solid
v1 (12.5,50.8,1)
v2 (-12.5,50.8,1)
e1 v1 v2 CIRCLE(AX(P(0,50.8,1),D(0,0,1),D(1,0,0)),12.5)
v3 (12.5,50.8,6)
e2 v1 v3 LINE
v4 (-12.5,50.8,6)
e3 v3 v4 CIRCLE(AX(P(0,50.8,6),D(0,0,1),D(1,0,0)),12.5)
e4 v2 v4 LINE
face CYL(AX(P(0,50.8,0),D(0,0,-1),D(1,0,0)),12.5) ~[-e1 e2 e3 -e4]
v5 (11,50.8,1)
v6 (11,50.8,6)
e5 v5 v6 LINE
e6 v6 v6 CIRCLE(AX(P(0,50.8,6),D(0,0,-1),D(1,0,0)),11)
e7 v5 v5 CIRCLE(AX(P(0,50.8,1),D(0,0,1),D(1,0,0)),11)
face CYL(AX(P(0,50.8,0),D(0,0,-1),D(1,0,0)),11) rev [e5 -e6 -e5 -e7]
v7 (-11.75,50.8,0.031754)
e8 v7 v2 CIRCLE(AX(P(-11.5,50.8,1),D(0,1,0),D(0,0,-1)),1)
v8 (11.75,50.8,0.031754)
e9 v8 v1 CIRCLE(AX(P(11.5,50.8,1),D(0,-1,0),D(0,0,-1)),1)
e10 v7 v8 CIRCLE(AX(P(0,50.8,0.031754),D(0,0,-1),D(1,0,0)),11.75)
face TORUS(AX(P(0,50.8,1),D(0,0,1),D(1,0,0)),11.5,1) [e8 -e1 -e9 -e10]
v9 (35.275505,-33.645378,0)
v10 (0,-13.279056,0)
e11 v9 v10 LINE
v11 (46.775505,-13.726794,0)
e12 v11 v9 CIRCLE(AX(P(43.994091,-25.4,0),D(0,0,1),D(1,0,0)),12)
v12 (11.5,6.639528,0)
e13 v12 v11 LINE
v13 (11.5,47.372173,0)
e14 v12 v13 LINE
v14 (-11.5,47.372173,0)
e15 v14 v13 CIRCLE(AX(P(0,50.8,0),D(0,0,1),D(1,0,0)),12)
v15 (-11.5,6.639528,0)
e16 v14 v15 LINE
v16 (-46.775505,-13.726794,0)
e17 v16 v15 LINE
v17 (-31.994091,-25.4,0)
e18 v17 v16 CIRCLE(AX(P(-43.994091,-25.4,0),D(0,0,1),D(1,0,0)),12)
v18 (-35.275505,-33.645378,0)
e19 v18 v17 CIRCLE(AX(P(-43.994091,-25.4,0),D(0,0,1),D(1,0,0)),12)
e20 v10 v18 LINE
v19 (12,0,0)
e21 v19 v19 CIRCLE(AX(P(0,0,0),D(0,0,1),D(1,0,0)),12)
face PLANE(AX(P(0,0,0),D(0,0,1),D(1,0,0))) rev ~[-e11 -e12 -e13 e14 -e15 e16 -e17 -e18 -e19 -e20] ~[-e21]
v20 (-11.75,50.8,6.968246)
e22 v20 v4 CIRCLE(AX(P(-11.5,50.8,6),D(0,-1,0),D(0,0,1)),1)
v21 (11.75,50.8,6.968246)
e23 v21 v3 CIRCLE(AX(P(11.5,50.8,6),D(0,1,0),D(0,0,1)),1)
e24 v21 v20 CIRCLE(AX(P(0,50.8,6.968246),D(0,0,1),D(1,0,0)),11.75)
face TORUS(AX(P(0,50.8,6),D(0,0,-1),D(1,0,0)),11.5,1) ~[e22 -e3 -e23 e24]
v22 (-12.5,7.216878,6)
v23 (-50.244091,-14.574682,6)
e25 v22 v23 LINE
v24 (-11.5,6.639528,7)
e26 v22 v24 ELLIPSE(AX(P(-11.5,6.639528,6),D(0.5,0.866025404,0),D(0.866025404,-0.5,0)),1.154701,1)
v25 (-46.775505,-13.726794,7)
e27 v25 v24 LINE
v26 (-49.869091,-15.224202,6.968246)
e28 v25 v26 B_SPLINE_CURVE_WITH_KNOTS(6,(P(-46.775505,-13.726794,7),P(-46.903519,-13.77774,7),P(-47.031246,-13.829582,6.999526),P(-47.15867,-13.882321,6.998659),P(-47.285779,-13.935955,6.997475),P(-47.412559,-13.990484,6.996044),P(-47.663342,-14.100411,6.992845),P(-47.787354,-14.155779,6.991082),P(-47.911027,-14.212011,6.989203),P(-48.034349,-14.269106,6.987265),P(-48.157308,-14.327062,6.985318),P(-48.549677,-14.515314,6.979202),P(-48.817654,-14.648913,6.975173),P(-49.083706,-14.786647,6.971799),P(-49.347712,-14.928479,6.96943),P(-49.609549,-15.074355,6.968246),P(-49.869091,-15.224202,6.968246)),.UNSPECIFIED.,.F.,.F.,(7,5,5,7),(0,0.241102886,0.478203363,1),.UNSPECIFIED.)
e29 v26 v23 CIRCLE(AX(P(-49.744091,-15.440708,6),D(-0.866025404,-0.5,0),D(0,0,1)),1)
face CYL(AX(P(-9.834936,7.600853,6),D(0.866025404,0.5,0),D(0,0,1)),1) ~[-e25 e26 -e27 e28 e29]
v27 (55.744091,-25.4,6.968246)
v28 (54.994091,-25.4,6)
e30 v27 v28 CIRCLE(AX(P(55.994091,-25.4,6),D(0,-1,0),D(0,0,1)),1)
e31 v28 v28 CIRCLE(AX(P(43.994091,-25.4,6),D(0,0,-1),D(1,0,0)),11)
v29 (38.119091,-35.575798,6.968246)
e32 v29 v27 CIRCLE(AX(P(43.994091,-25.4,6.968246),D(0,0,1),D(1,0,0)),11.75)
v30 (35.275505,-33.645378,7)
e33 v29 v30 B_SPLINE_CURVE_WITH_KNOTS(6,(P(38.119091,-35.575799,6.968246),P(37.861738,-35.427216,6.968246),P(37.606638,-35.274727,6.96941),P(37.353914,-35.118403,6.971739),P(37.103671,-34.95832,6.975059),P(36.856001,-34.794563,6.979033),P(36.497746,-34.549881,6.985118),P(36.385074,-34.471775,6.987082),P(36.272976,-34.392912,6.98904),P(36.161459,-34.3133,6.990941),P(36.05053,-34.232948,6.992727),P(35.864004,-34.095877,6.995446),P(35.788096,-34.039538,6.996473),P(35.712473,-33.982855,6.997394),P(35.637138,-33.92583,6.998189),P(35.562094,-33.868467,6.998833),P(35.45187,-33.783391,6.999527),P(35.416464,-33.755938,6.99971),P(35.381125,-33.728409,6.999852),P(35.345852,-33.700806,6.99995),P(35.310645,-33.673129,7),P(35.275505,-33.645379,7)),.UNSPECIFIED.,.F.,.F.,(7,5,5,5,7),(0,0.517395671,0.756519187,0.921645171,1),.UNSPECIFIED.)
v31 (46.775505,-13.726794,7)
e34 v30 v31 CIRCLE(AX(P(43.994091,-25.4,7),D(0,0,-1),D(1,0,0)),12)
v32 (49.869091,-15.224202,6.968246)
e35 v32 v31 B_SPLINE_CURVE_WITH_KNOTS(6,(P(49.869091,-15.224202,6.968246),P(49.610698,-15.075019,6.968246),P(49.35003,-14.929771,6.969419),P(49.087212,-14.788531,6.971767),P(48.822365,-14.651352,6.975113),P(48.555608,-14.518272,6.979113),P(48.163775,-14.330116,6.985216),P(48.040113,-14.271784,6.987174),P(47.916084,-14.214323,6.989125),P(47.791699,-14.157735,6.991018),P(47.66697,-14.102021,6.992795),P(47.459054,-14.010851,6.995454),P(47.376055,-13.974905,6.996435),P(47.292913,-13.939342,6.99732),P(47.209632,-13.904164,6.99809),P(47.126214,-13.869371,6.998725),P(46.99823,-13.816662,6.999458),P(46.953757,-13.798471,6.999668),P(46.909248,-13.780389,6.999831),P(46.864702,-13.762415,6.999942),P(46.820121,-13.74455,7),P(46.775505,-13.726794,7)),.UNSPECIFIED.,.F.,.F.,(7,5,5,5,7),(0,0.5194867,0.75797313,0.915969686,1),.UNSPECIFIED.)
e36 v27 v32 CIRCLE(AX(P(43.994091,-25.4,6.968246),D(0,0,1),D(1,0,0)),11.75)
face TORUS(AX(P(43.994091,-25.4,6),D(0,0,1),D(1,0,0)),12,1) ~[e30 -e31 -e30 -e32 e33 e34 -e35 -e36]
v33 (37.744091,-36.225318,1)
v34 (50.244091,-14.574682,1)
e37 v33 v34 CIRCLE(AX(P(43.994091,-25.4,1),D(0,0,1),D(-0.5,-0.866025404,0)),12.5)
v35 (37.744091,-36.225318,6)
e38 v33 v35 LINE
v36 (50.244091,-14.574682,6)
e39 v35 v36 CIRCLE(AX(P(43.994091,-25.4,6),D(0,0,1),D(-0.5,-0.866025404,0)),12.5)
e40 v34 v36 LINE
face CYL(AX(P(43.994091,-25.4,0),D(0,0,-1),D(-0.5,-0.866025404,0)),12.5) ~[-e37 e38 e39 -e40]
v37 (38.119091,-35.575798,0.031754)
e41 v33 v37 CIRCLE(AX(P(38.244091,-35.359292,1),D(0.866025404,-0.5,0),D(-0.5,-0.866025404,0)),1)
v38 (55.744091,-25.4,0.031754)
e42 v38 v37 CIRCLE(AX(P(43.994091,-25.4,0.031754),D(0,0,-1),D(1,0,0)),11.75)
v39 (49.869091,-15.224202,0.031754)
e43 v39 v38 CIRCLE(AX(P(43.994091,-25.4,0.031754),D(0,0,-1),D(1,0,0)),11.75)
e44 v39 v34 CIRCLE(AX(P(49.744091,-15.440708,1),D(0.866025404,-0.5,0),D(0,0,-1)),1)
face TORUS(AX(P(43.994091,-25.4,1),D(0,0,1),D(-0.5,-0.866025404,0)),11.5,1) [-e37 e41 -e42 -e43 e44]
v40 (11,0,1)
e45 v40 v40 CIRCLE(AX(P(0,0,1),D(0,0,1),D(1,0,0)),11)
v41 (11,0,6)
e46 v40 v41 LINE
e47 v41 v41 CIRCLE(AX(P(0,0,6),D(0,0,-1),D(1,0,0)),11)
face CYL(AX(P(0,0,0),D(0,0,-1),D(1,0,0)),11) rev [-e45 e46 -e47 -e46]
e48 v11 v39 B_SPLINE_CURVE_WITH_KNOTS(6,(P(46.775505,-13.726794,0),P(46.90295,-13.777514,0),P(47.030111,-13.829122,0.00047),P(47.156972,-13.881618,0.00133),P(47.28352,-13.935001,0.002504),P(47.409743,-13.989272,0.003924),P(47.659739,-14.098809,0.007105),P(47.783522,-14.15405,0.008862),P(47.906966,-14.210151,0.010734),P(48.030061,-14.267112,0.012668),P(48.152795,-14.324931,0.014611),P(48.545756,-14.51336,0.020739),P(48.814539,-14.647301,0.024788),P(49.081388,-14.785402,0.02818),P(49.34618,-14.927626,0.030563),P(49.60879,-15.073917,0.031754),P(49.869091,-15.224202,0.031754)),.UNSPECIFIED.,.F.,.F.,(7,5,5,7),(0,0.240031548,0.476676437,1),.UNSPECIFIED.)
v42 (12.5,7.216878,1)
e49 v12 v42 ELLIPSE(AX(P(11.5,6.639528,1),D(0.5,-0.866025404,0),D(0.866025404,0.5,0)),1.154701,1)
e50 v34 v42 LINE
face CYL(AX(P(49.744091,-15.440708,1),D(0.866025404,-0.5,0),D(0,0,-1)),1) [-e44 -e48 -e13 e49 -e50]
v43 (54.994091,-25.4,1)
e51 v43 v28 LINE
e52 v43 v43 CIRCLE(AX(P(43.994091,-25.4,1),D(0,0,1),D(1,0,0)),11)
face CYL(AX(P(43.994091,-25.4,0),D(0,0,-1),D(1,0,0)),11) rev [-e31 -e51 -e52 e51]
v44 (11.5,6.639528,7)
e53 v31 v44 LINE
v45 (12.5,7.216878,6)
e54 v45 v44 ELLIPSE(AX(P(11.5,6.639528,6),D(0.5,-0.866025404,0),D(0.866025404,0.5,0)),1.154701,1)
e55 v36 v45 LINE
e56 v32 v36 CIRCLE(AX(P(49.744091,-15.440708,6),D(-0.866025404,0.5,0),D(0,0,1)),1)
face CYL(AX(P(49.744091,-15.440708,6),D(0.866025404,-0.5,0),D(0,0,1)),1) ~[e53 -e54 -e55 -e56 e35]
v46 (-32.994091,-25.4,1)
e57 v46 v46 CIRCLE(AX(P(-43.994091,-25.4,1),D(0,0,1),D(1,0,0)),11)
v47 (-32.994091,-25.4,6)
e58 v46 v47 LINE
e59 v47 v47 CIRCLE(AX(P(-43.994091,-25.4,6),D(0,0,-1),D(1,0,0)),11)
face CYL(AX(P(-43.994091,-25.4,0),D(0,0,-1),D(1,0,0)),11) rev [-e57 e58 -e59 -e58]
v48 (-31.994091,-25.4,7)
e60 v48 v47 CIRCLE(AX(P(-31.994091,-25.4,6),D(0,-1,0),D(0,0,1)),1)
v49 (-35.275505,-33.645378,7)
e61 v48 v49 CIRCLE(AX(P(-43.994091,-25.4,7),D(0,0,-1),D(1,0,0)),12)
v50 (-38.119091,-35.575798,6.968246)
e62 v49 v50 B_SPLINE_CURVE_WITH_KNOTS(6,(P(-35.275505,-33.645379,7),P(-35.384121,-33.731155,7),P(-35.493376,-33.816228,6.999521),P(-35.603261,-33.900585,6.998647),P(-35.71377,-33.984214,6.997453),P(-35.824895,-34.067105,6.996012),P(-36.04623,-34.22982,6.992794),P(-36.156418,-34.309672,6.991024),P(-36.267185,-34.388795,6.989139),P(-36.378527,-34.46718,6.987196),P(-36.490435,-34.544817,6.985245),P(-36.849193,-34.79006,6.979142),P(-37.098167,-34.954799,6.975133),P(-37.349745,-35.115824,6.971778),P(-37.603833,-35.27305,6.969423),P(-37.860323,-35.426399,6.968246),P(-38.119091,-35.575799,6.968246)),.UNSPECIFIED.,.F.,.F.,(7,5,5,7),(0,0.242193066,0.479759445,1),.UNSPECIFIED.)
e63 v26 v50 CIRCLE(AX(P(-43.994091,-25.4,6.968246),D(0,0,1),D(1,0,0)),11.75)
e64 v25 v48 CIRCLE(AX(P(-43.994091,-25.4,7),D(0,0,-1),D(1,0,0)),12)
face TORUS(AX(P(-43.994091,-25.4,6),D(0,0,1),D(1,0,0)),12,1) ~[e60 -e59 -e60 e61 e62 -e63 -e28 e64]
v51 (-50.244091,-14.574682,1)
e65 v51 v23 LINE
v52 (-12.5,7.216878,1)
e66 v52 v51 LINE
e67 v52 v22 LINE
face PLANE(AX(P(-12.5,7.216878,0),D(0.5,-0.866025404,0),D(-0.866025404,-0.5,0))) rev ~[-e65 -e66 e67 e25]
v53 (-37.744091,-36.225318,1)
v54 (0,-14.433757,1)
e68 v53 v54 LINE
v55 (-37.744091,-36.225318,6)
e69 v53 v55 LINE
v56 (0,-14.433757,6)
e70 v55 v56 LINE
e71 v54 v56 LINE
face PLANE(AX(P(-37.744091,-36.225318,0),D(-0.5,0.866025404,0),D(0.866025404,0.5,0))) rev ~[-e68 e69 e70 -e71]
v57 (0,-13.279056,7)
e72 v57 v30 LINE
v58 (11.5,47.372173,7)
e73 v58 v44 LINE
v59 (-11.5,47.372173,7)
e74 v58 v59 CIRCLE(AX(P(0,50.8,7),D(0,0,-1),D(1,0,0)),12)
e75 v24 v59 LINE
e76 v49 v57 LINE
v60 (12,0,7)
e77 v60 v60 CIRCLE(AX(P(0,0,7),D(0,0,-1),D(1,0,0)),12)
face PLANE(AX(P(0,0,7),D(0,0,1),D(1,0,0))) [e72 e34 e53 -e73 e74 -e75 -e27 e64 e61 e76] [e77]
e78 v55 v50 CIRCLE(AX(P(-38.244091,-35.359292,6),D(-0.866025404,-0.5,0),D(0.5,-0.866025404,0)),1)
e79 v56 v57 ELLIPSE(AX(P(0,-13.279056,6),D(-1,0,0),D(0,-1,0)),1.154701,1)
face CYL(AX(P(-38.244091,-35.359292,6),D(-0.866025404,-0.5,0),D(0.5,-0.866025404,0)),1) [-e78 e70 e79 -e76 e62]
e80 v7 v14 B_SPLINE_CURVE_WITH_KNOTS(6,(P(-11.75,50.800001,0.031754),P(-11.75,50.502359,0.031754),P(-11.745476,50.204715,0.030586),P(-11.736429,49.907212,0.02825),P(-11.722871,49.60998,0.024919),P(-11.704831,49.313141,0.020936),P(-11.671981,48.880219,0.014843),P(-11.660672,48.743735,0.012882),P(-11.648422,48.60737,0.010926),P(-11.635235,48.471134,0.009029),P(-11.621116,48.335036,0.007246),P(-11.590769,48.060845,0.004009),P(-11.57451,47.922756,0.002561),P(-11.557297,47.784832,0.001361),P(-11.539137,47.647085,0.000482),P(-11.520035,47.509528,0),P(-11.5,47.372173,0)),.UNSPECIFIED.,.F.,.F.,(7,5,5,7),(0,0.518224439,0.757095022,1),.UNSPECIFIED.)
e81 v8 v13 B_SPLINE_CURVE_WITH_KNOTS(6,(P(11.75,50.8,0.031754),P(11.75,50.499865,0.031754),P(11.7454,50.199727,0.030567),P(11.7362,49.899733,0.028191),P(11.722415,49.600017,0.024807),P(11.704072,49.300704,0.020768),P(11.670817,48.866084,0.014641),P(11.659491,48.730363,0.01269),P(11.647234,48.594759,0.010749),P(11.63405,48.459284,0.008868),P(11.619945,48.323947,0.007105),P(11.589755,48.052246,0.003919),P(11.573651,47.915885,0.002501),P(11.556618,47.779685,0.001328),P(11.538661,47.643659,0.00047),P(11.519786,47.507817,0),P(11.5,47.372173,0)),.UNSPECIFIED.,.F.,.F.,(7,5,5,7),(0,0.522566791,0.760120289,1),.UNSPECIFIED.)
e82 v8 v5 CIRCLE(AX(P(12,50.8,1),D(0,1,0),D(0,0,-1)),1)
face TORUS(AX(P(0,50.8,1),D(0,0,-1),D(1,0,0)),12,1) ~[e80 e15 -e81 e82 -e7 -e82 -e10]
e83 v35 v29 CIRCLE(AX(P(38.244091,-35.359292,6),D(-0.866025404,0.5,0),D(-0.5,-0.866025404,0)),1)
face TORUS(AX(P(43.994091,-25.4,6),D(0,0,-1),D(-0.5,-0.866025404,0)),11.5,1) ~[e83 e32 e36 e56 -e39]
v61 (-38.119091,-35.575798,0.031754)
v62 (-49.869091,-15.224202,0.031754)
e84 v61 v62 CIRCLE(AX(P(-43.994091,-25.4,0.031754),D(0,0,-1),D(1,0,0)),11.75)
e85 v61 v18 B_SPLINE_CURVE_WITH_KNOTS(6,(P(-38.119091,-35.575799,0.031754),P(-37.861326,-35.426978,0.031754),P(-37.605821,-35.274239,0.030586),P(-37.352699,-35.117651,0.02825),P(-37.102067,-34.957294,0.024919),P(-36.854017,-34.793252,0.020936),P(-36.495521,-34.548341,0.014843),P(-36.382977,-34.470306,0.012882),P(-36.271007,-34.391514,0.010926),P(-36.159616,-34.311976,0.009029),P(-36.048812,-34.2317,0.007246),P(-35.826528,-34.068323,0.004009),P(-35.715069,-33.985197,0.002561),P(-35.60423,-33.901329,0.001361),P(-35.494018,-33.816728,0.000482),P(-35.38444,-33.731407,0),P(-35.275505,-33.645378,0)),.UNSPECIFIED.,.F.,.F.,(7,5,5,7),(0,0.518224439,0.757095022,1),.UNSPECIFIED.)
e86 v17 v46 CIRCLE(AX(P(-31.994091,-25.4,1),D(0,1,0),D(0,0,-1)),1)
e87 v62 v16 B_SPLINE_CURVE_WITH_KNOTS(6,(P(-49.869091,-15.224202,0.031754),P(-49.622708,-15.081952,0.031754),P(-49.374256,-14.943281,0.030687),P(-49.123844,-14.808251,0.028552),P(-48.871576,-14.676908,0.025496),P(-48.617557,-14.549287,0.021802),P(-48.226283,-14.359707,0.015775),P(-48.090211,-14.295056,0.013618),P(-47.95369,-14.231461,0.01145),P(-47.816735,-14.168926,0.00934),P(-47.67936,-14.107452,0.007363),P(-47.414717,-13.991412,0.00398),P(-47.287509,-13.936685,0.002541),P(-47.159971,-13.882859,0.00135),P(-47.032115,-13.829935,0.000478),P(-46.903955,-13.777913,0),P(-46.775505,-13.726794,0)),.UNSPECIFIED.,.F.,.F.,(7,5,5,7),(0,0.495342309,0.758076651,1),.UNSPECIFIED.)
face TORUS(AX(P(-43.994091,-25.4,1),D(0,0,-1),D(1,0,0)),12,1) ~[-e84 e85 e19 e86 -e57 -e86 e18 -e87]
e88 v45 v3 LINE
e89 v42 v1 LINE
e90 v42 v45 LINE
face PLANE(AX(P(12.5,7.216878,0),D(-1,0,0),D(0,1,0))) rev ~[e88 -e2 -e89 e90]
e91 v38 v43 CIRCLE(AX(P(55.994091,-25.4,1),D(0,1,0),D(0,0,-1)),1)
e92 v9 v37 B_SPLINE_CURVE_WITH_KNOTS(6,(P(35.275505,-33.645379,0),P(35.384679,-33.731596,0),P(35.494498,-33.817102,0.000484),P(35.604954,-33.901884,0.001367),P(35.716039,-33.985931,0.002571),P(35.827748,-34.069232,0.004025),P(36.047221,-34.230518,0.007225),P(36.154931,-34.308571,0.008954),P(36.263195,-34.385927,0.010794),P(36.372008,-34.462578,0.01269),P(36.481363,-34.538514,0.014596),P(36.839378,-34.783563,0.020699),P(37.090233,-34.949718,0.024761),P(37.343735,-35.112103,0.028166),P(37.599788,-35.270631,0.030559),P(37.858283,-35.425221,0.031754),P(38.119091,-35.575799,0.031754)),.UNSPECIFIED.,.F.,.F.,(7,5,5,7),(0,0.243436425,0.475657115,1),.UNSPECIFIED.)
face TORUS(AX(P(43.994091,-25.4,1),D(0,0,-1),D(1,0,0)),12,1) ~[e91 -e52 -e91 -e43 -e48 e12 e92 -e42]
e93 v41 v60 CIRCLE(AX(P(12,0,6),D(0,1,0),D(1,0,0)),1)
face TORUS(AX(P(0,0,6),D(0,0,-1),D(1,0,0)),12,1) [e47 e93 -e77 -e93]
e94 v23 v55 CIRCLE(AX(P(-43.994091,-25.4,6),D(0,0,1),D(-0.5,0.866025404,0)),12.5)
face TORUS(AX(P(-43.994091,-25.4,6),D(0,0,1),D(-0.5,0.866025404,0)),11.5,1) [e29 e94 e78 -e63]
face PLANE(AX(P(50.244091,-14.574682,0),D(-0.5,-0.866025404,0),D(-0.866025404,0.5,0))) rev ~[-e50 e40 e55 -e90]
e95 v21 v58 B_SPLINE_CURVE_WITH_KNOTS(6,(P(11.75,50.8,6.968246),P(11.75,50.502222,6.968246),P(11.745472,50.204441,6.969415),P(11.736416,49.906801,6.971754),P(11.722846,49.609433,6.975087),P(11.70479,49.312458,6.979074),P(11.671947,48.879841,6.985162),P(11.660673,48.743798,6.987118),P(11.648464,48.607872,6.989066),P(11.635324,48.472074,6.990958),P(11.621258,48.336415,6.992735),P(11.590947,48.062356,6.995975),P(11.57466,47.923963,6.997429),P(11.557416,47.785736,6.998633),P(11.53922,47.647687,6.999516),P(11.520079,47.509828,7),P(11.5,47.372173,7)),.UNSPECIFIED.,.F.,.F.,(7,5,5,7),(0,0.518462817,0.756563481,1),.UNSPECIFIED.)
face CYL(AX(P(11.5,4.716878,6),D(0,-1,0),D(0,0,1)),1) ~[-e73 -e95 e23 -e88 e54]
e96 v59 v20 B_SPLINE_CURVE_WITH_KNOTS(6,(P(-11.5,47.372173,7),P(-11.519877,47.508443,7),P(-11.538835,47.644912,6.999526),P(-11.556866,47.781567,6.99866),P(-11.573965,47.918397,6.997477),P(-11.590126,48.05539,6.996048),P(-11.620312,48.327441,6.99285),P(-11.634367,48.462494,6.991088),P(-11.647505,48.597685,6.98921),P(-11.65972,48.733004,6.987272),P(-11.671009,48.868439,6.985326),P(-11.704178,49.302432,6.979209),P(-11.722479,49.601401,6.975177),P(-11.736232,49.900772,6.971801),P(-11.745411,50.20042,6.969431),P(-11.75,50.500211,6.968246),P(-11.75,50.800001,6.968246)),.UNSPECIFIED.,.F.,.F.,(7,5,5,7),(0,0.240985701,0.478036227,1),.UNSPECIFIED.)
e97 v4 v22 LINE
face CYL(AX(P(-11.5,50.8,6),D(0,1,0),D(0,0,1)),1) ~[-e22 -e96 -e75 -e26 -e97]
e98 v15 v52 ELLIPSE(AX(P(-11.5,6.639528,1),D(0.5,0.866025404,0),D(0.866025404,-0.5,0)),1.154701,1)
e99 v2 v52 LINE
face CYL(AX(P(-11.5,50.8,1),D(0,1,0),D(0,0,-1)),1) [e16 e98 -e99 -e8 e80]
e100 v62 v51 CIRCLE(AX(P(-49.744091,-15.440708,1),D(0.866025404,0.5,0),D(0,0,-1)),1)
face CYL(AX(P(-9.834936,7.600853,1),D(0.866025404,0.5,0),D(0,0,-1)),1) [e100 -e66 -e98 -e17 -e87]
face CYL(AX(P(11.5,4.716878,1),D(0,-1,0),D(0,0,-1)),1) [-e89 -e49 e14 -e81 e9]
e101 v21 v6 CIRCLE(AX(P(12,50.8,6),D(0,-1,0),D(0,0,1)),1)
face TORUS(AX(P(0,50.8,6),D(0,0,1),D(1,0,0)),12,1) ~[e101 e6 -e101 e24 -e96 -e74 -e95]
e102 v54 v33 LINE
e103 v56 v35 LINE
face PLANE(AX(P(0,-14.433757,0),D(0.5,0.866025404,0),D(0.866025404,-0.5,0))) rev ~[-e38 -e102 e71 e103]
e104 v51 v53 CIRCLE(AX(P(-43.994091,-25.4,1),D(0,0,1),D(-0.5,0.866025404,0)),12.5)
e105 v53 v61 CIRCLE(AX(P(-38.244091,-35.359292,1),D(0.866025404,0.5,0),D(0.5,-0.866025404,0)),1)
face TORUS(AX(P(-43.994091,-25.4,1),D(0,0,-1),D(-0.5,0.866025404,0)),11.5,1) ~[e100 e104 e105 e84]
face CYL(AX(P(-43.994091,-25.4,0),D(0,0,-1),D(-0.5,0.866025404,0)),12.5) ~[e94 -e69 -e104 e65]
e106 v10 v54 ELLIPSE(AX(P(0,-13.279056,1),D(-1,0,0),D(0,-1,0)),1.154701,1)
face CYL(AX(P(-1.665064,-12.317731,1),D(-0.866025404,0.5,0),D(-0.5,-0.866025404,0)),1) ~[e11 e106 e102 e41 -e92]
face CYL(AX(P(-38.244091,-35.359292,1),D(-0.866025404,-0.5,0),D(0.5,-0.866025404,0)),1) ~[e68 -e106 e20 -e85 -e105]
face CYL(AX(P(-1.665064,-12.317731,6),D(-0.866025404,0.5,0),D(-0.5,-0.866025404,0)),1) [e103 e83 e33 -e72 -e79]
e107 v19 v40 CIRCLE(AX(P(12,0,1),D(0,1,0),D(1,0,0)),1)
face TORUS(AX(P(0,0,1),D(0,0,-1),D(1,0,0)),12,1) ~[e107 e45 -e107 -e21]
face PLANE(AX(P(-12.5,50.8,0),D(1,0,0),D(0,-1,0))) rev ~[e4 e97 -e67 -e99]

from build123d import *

# Parameters (mm, degrees)
F2_DEPTH      = 7
F1_R          = 11
F3_DEPTH      = 25.4
F4_T8_DEPTH   = 46.0831216351
F4_T13_DEPTH  = 46.0831216351
F4_T18_DEPTH  = 46.0831216351
F4_T23_DEPTH  = 46.0831216351
F4_T28_DEPTH  = 46.0831216351
F4_T37_DEPTH  = 46.0831216351
F4_T42_DEPTH  = 46.0831216351
F4_T51_DEPTH  = 46.0831216351
F4_T56_DEPTH  = 46.0831216351
F4_T59_ANGLE  = 180
F4_T61_ANGLE  = 180
F4_T63_ANGLE  = 180
F4_T67_DEPTH  = 46.0831216351
F4_T70_ANGLE  = 180
F4_T74_DEPTH  = 46.0831216351
F4_T77_ANGLE  = 180
F4_T81_DEPTH  = 46.0831216351
F4_T84_ANGLE  = 180
F4_T89_DEPTH  = 46.0831216351
F4_T93_DEPTH  = 46.0831216351
F4_T100_DEPTH = 46.0831216351
F4_T104_DEPTH = 46.0831216351
F4_T111_DEPTH = 46.0831216351
F4_T115_DEPTH = 46.0831216351
F4_T122_DEPTH = 46.0831216351
F4_T126_DEPTH = 46.0831216351
F4_T133_DEPTH = 46.0831216351
F4_T137_DEPTH = 46.0831216351
F4_T144_DEPTH = 46.0831216351
F4_T148_DEPTH = 46.0831216351
F5_R          = 1


# Not quite as in the source:
# - a fillet or chamfer that OpenCascade refuses, or shapes differently, is made with other operations: its cross-section is extruded or revolved along the edge and cut away or added


with BuildPart() as f2:
    # F0 (on Top) → F2 (new body)
    with BuildSketch(Plane.XY):
        with BuildLine():
            ThreePointArc((12.5, 50.8), (0, 63.3), (-12.5, 50.8))
            Line((-12.5, 50.8), (-12.5, 7.2168783649))
            Line((-12.5, 7.2168783649), (-50.2440905122, -14.5746824527))
            ThreePointArc((-50.2440905122, -14.5746824527), (-54.8194080596, -31.65), (-37.7440905122, -36.2253175473))
            Line((-37.7440905122, -36.2253175473), (0, -14.4337567297))
            Line((0, -14.4337567297), (37.7440905122, -36.2253175473))
            ThreePointArc((37.7440905122, -36.2253175473), (54.8194080596, -31.65), (50.2440905122, -14.5746824527))
            Line((50.2440905122, -14.5746824527), (12.5, 7.2168783649))
            Line((12.5, 7.2168783649), (12.5, 50.8))
        make_face()
    extrude(amount=F2_DEPTH)

    # F1 (on Top) → F3 (cut)
    with BuildSketch(Plane.XY):
        with Locations((0, 50.8)):
            Circle(F1_R)
        with Locations((-43.9940905122, -25.4)):
            Circle(F1_R)
        with Locations((43.9940905122, -25.4)):
            Circle(F1_R)
        Circle(F1_R)
    extrude(amount=F3_DEPTH, mode=Mode.SUBTRACT)

    # F4: fillet of radius 1 on 15 edges, made by hand

    # F4_s1 → F4_t2 (revolve, cut)
    with BuildSketch(Plane.XZ.offset(-50.8)):
        with BuildLine():
            ThreePointArc((12, 7), (11.2928932188, 6.7071067812), (11, 6))
            Line((11, 6), (11, 7))
            Line((11, 7), (12, 7))
        make_face()
    revolve(axis=Axis((0, 50.8, 7), (0, 0, -1)), mode=Mode.SUBTRACT)

    # F4_s3 → F4_t4 (revolve, cut)
    with BuildSketch(Plane.XZ.offset(-50.8)):
        with BuildLine():
            ThreePointArc((12, 0), (11.2928932188, 0.2928932188), (11, 1))
            Line((11, 1), (11, 0))
            Line((11, 0), (12, 0))
        make_face()
    revolve(axis=Axis((0, 50.8, 0), (0, 0, 1)), mode=Mode.SUBTRACT)


with BuildPart() as f4_tool6:
    # F4_s7 → F4_t8 (new body)
    with BuildSketch(Plane.XZ.offset(-50.8)):
        with BuildLine():
            ThreePointArc((-11.5, 0), (-12.2071067812, 0.2928932188), (-12.5, 1))
            Line((-12.5, 1), (-12.5, 0))
            Line((-12.5, 0), (-11.5, 0))
        make_face()
    extrude(amount=F4_T8_DEPTH)

    split(bisect_by=Plane(origin=(-6.25, 10.8253175473, 0), x_dir=(0, 0, 1), z_dir=(-0.5, 0.8660254038, 0)), keep=Keep.TOP)


with BuildPart() as f2_1:
    add(f2.part)

    # F4_t5: cut F4_tool6
    add(f4_tool6.part, mode=Mode.SUBTRACT)


with BuildPart() as f4_tool11:
    # F4_s12 → F4_t13 (new body)
    with BuildSketch(Plane.XZ.offset(-4.7168783649)):
        with BuildLine():
            ThreePointArc((11.5, 0), (12.2071067812, 0.2928932188), (12.5, 1))
            Line((12.5, 1), (12.5, 0))
            Line((12.5, 0), (11.5, 0))
        make_face()
    extrude(amount=-F4_T13_DEPTH)

    split(bisect_by=Plane(origin=(6.25, 10.8253175473, 0), x_dir=(0, 0, 1), z_dir=(0.5, 0.8660254038, 0)), keep=Keep.TOP)


with BuildPart() as f2_2:
    add(f2_1.part)

    # F4_t10: cut F4_tool11
    add(f4_tool11.part, mode=Mode.SUBTRACT)


with BuildPart() as f4_tool16:
    # F4_s17 → F4_t18 (new body)
    with BuildSketch(Plane.XZ.offset(-4.7168783649)):
        with BuildLine():
            ThreePointArc((11.5, 7), (12.2071067812, 6.7071067812), (12.5, 6))
            Line((12.5, 6), (12.5, 7))
            Line((12.5, 7), (11.5, 7))
        make_face()
    extrude(amount=-F4_T18_DEPTH)

    split(bisect_by=Plane(origin=(6.25, 10.8253175473, 0), x_dir=(0, 0, 1), z_dir=(0.5, 0.8660254038, 0)), keep=Keep.TOP)


with BuildPart() as f2_3:
    add(f2_2.part)

    # F4_t15: cut F4_tool16
    add(f4_tool16.part, mode=Mode.SUBTRACT)


with BuildPart() as f4_tool21:
    # F4_s22 → F4_t23 (new body)
    with BuildSketch(Plane(origin=(-4.0849364905, -2.3584391824, 0), x_dir=(0, 0, 1), z_dir=(-0.8660254038, -0.5, 0))):
        with BuildLine():
            ThreePointArc((0, 11.5), (0.2928932188, 12.2071067812), (1, 12.5))
            Line((1, 12.5), (0, 12.5))
            Line((0, 12.5), (0, 11.5))
        make_face()
    extrude(amount=F4_T23_DEPTH)

    split(bisect_by=Plane.YZ.offset(-12.5), keep=Keep.BOTTOM)


with BuildPart() as f2_4:
    add(f2_3.part)

    # F4_t20: cut F4_tool21
    add(f4_tool21.part, mode=Mode.SUBTRACT)


with BuildPart() as f4_tool26:
    # F4_s27 → F4_t28 (new body)
    with BuildSketch(Plane(origin=(-4.0849364905, -2.3584391824, 0), x_dir=(0, 0, 1), z_dir=(-0.8660254038, -0.5, 0))):
        with BuildLine():
            ThreePointArc((7, 11.5), (6.7071067812, 12.2071067812), (6, 12.5))
            Line((6, 12.5), (7, 12.5))
            Line((7, 12.5), (7, 11.5))
        make_face()
    extrude(amount=F4_T28_DEPTH)

    split(bisect_by=Plane.YZ.offset(-12.5), keep=Keep.BOTTOM)


with BuildPart() as f2_5:
    add(f2_4.part)

    # F4_t25: cut F4_tool26
    add(f4_tool26.part, mode=Mode.SUBTRACT)

    # F4_s30 → F4_t31 (revolve, cut)
    with BuildSketch(Plane.XZ.offset(25.4)):
        with BuildLine():
            ThreePointArc((-31.9940905122, 0), (-32.7011972934, 0.2928932188), (-32.9940905122, 1))
            Line((-32.9940905122, 1), (-32.9940905122, 0))
            Line((-32.9940905122, 0), (-31.9940905122, 0))
        make_face()
    revolve(axis=Axis((-43.9940905122, -25.4, 0), (0, 0, 1)), mode=Mode.SUBTRACT)

    # F4_s32 → F4_t33 (revolve, cut)
    with BuildSketch(Plane.XZ.offset(25.4)):
        with BuildLine():
            ThreePointArc((-31.9940905122, 7), (-32.7011972934, 6.7071067812), (-32.9940905122, 6))
            Line((-32.9940905122, 6), (-32.9940905122, 7))
            Line((-32.9940905122, 7), (-31.9940905122, 7))
        make_face()
    revolve(axis=Axis((-43.9940905122, -25.4, 7), (0, 0, -1)), mode=Mode.SUBTRACT)


with BuildPart() as f4_tool35:
    # F4_s36 → F4_t37 (new body)
    with BuildSketch(Plane(origin=(43.9940905122, -25.4, 0), x_dir=(0, 0, 1), z_dir=(-0.8660254038, 0.5, 0))):
        with BuildLine():
            ThreePointArc((7, 11.5), (6.7071067812, 12.2071067812), (6, 12.5))
            Line((6, 12.5), (7, 12.5))
            Line((7, 12.5), (7, 11.5))
        make_face()
    extrude(amount=F4_T37_DEPTH)

    split(bisect_by=Plane.YZ.offset(12.5), keep=Keep.TOP)


with BuildPart() as f2_6:
    add(f2_5.part)

    # F4_t34: cut F4_tool35
    add(f4_tool35.part, mode=Mode.SUBTRACT)


with BuildPart() as f4_tool40:
    # F4_s41 → F4_t42 (new body)
    with BuildSketch(Plane(origin=(4.0849364905, -2.3584391824, 0), x_dir=(0, 0, 1), z_dir=(0.8660254038, -0.5, 0))):
        with BuildLine():
            ThreePointArc((6, 12.5), (6.7071067812, 12.2071067812), (7, 11.5))
            Line((7, 11.5), (7, 12.5))
            Line((7, 12.5), (6, 12.5))
        make_face()
    extrude(amount=F4_T42_DEPTH)

    split(bisect_by=Plane(origin=(6.25, -10.8253175473, 0), x_dir=(0, 0, 1), z_dir=(0.5, -0.8660254038, 0)), keep=Keep.TOP)


with BuildPart() as f2_7:
    add(f2_6.part)

    # F4_t39: cut F4_tool40
    add(f4_tool40.part, mode=Mode.SUBTRACT)

    # F4_s44 → F4_t45 (revolve, cut)
    with BuildSketch(Plane.XZ.offset(25.4)):
        with BuildLine():
            ThreePointArc((55.9940905122, 7), (55.2869837311, 6.7071067812), (54.9940905122, 6))
            Line((54.9940905122, 6), (54.9940905122, 7))
            Line((54.9940905122, 7), (55.9940905122, 7))
        make_face()
    revolve(axis=Axis((43.9940905122, -25.4, 7), (0, 0, -1)), mode=Mode.SUBTRACT)

    # F4_s46 → F4_t47 (revolve, cut)
    with BuildSketch(Plane.XZ.offset(25.4)):
        with BuildLine():
            ThreePointArc((55.9940905122, 0), (55.2869837311, 0.2928932188), (54.9940905122, 1))
            Line((54.9940905122, 1), (54.9940905122, 0))
            Line((54.9940905122, 0), (55.9940905122, 0))
        make_face()
    revolve(axis=Axis((43.9940905122, -25.4, 0), (0, 0, 1)), mode=Mode.SUBTRACT)


with BuildPart() as f4_tool49:
    # F4_s50 → F4_t51 (new body)
    with BuildSketch(Plane(origin=(4.0849364905, -2.3584391824, 0), x_dir=(0, 0, 1), z_dir=(0.8660254038, -0.5, 0))):
        with BuildLine():
            ThreePointArc((1, 12.5), (0.2928932188, 12.2071067812), (0, 11.5))
            Line((0, 11.5), (0, 12.5))
            Line((0, 12.5), (1, 12.5))
        make_face()
    extrude(amount=F4_T51_DEPTH)

    split(bisect_by=Plane(origin=(6.25, -10.8253175473, 0), x_dir=(0, 0, 1), z_dir=(0.5, -0.8660254038, 0)), keep=Keep.TOP)


with BuildPart() as f2_8:
    add(f2_7.part)

    # F4_t48: cut F4_tool49
    add(f4_tool49.part, mode=Mode.SUBTRACT)


with BuildPart() as f4_tool54:
    # F4_s55 → F4_t56 (new body)
    with BuildSketch(Plane(origin=(43.9940905122, -25.4, 0), x_dir=(0, 0, 1), z_dir=(-0.8660254038, 0.5, 0))):
        with BuildLine():
            ThreePointArc((0, 11.5), (0.2928932188, 12.2071067812), (1, 12.5))
            Line((1, 12.5), (0, 12.5))
            Line((0, 12.5), (0, 11.5))
        make_face()
    extrude(amount=F4_T56_DEPTH)

    split(bisect_by=Plane.YZ.offset(12.5), keep=Keep.TOP)


with BuildPart() as f2_9:
    add(f2_8.part)

    # F4_t53: cut F4_tool54
    add(f4_tool54.part, mode=Mode.SUBTRACT)

    # F4_s58 → F4_t59 (revolve, cut)
    with BuildSketch(Plane(origin=(43.9940905122, -25.4, 0), x_dir=(0, 0, 1), z_dir=(-0.8660254038, 0.5, 0))):
        with BuildLine():
            ThreePointArc((0, -11.5), (0.2928932188, -12.2071067812), (1, -12.5))
            Line((1, -12.5), (0, -12.5))
            Line((0, -12.5), (0, -11.5))
        make_face()
    revolve(axis=Axis((43.9940905122, -25.4, 0), (0, 0, 1)), revolution_arc=F4_T59_ANGLE, mode=Mode.SUBTRACT)

    # F4_s60 → F4_t61 (revolve, cut)
    with BuildSketch(Plane(origin=(43.9940905122, -25.4, 0), x_dir=(0, 0, 1), z_dir=(-0.8660254038, 0.5, 0))):
        with BuildLine():
            ThreePointArc((7, -11.5), (6.7071067812, -12.2071067812), (6, -12.5))
            Line((6, -12.5), (7, -12.5))
            Line((7, -12.5), (7, -11.5))
        make_face()
    revolve(axis=Axis((43.9940905122, -25.4, 7), (0, 0, 1)), revolution_arc=F4_T61_ANGLE, mode=Mode.SUBTRACT)

    # F4_s62 → F4_t63 (revolve, cut)
    with BuildSketch(Plane(origin=(-43.9940905122, -25.4, 0), x_dir=(0, 0, 1), z_dir=(0.8660254038, 0.5, 0))):
        with BuildLine():
            ThreePointArc((6, -12.5), (6.7071067812, -12.2071067812), (7, -11.5))
            Line((7, -11.5), (7, -12.5))
            Line((7, -12.5), (6, -12.5))
        make_face()
    revolve(axis=Axis((-43.9940905122, -25.4, 7), (0, 0, 1)), revolution_arc=F4_T63_ANGLE, mode=Mode.SUBTRACT)


with BuildPart() as f4_tool65:
    # F4_s66 → F4_t67 (new body)
    with BuildSketch(Plane(origin=(-43.9940905122, -25.4, 0), x_dir=(0, 0, 1), z_dir=(0.8660254038, 0.5, 0))):
        with BuildLine():
            ThreePointArc((6, 12.5), (6.7071067812, 12.2071067812), (7, 11.5))
            Line((7, 11.5), (7, 12.5))
            Line((7, 12.5), (6, 12.5))
        make_face()
    extrude(amount=F4_T67_DEPTH)

    split(bisect_by=Plane(origin=(-6.25, -10.8253175473, 0), x_dir=(0, 0, 1), z_dir=(-0.5, -0.8660254038, 0)), keep=Keep.TOP)


with BuildPart() as f2_10:
    add(f2_9.part)

    # F4_t64: cut F4_tool65
    add(f4_tool65.part, mode=Mode.SUBTRACT)

    # F4_s69 → F4_t70 (revolve, cut)
    with BuildSketch(Plane(origin=(-43.9940905122, -25.4, 0), x_dir=(0, 0, 1), z_dir=(0.8660254038, 0.5, 0))):
        with BuildLine():
            ThreePointArc((1, -12.5), (0.2928932188, -12.2071067812), (0, -11.5))
            Line((0, -11.5), (0, -12.5))
            Line((0, -12.5), (1, -12.5))
        make_face()
    revolve(axis=Axis((-43.9940905122, -25.4, 0), (0, 0, 1)), revolution_arc=F4_T70_ANGLE, mode=Mode.SUBTRACT)


with BuildPart() as f4_tool72:
    # F4_s73 → F4_t74 (new body)
    with BuildSketch(Plane(origin=(-43.9940905122, -25.4, 0), x_dir=(0, 0, 1), z_dir=(0.8660254038, 0.5, 0))):
        with BuildLine():
            ThreePointArc((1, 12.5), (0.2928932188, 12.2071067812), (0, 11.5))
            Line((0, 11.5), (0, 12.5))
            Line((0, 12.5), (1, 12.5))
        make_face()
    extrude(amount=F4_T74_DEPTH)

    split(bisect_by=Plane(origin=(-6.25, -10.8253175473, 0), x_dir=(0, 0, 1), z_dir=(-0.5, -0.8660254038, 0)), keep=Keep.TOP)


with BuildPart() as f2_11:
    add(f2_10.part)

    # F4_t71: cut F4_tool72
    add(f4_tool72.part, mode=Mode.SUBTRACT)

    # F4_s76 → F4_t77 (revolve, cut)
    with BuildSketch(Plane.XZ.offset(-50.8)):
        with BuildLine():
            ThreePointArc((11.5, 7), (12.2071067812, 6.7071067812), (12.5, 6))
            Line((12.5, 6), (12.5, 7))
            Line((12.5, 7), (11.5, 7))
        make_face()
    revolve(axis=Axis((0, 50.8, 7), (0, 0, 1)), revolution_arc=F4_T77_ANGLE, mode=Mode.SUBTRACT)


with BuildPart() as f4_tool79:
    # F4_s80 → F4_t81 (new body)
    with BuildSketch(Plane.XZ.offset(-50.8)):
        with BuildLine():
            ThreePointArc((-11.5, 7), (-12.2071067812, 6.7071067812), (-12.5, 6))
            Line((-12.5, 6), (-12.5, 7))
            Line((-12.5, 7), (-11.5, 7))
        make_face()
    extrude(amount=F4_T81_DEPTH)

    split(bisect_by=Plane(origin=(-6.25, 10.8253175473, 0), x_dir=(0, 0, 1), z_dir=(-0.5, 0.8660254038, 0)), keep=Keep.TOP)


with BuildPart() as f2_12:
    add(f2_11.part)

    # F4_t78: cut F4_tool79
    add(f4_tool79.part, mode=Mode.SUBTRACT)

    # F4_s83 → F4_t84 (revolve, cut)
    with BuildSketch(Plane.XZ.offset(-50.8)):
        with BuildLine():
            ThreePointArc((11.5, 0), (12.2071067812, 0.2928932188), (12.5, 1))
            Line((12.5, 1), (12.5, 0))
            Line((12.5, 0), (11.5, 0))
        make_face()
    revolve(axis=Axis((0, 50.8, 0), (0, 0, 1)), revolution_arc=F4_T84_ANGLE, mode=Mode.SUBTRACT)


with BuildPart() as f4_tool87:
    # F4_s88 → F4_t89 (new body)
    with BuildSketch(Plane(origin=(-4.0849364905, -2.3584391824, 0), x_dir=(0, 0, 1), z_dir=(-0.8660254038, -0.5, 0))):
        with BuildLine():
            ThreePointArc((0, 11.5), (0.2928932188, 12.2071067812), (1, 12.5))
            Line((1, 12.5), (0, 12.5))
            Line((0, 12.5), (0, 11.5))
        make_face()
    extrude(amount=F4_T89_DEPTH)

    split(bisect_by=Plane.YZ.offset(-12.5), keep=Keep.TOP)


with BuildPart() as f4_tool91:
    # F4_s92 → F4_t93 (new body)
    with BuildSketch(Plane.XZ.offset(-50.8)):
        with BuildLine():
            ThreePointArc((-11.5, 0), (-12.2071067812, 0.2928932188), (-12.5, 1))
            Line((-12.5, 1), (-12.5, 0))
            Line((-12.5, 0), (-11.5, 0))
        make_face()
    extrude(amount=F4_T93_DEPTH)

    split(bisect_by=Plane(origin=(-6.25, 10.8253175473, 0), x_dir=(0, 0, 1), z_dir=(0.5, -0.8660254038, 0)), keep=Keep.TOP)


with BuildPart() as f4_tool87_1:
    add(f4_tool87.part)

    # F4_t95: intersect F4_tool91
    add(f4_tool91.part, mode=Mode.INTERSECT)


with BuildPart() as f2_13:
    add(f2_12.part)

    # F4_t85: cut F4_tool87
    add(f4_tool87_1.part, mode=Mode.SUBTRACT)


with BuildPart() as f4_tool98:
    # F4_s99 → F4_t100 (new body)
    with BuildSketch(Plane(origin=(43.9940905122, -25.4, 0), x_dir=(0, 0, 1), z_dir=(-0.8660254038, 0.5, 0))):
        with BuildLine():
            ThreePointArc((0, 11.5), (0.2928932188, 12.2071067812), (1, 12.5))
            Line((1, 12.5), (0, 12.5))
            Line((0, 12.5), (0, 11.5))
        make_face()
    extrude(amount=F4_T100_DEPTH)

    split(bisect_by=Plane.YZ.offset(12.5), keep=Keep.BOTTOM)


with BuildPart() as f4_tool102:
    # F4_s103 → F4_t104 (new body)
    with BuildSketch(Plane.XZ.offset(-4.7168783649)):
        with BuildLine():
            ThreePointArc((11.5, 0), (12.2071067812, 0.2928932188), (12.5, 1))
            Line((12.5, 1), (12.5, 0))
            Line((12.5, 0), (11.5, 0))
        make_face()
    extrude(amount=-F4_T104_DEPTH)

    split(bisect_by=Plane(origin=(6.25, 10.8253175473, 0), x_dir=(0, 0, 1), z_dir=(-0.5, -0.8660254038, 0)), keep=Keep.TOP)


with BuildPart() as f4_tool98_1:
    add(f4_tool98.part)

    # F4_t106: intersect F4_tool102
    add(f4_tool102.part, mode=Mode.INTERSECT)


with BuildPart() as f2_14:
    add(f2_13.part)

    # F4_t96: cut F4_tool98
    add(f4_tool98_1.part, mode=Mode.SUBTRACT)


with BuildPart() as f4_tool109:
    # F4_s110 → F4_t111 (new body)
    with BuildSketch(Plane(origin=(43.9940905122, -25.4, 0), x_dir=(0, 0, 1), z_dir=(-0.8660254038, 0.5, 0))):
        with BuildLine():
            ThreePointArc((7, 11.5), (6.7071067812, 12.2071067812), (6, 12.5))
            Line((6, 12.5), (7, 12.5))
            Line((7, 12.5), (7, 11.5))
        make_face()
    extrude(amount=F4_T111_DEPTH)

    split(bisect_by=Plane.YZ.offset(12.5), keep=Keep.BOTTOM)


with BuildPart() as f4_tool113:
    # F4_s114 → F4_t115 (new body)
    with BuildSketch(Plane.XZ.offset(-4.7168783649)):
        with BuildLine():
            ThreePointArc((11.5, 7), (12.2071067812, 6.7071067812), (12.5, 6))
            Line((12.5, 6), (12.5, 7))
            Line((12.5, 7), (11.5, 7))
        make_face()
    extrude(amount=-F4_T115_DEPTH)

    split(bisect_by=Plane(origin=(6.25, 10.8253175473, 0), x_dir=(0, 0, 1), z_dir=(-0.5, -0.8660254038, 0)), keep=Keep.TOP)


with BuildPart() as f4_tool109_1:
    add(f4_tool109.part)

    # F4_t117: intersect F4_tool113
    add(f4_tool113.part, mode=Mode.INTERSECT)


with BuildPart() as f2_15:
    add(f2_14.part)

    # F4_t107: cut F4_tool109
    add(f4_tool109_1.part, mode=Mode.SUBTRACT)


with BuildPart() as f4_tool120:
    # F4_s121 → F4_t122 (new body)
    with BuildSketch(Plane(origin=(-4.0849364905, -2.3584391824, 0), x_dir=(0, 0, 1), z_dir=(-0.8660254038, -0.5, 0))):
        with BuildLine():
            ThreePointArc((7, 11.5), (6.7071067812, 12.2071067812), (6, 12.5))
            Line((6, 12.5), (7, 12.5))
            Line((7, 12.5), (7, 11.5))
        make_face()
    extrude(amount=F4_T122_DEPTH)

    split(bisect_by=Plane.YZ.offset(-12.5), keep=Keep.TOP)


with BuildPart() as f4_tool124:
    # F4_s125 → F4_t126 (new body)
    with BuildSketch(Plane.XZ.offset(-50.8)):
        with BuildLine():
            ThreePointArc((-11.5, 7), (-12.2071067812, 6.7071067812), (-12.5, 6))
            Line((-12.5, 6), (-12.5, 7))
            Line((-12.5, 7), (-11.5, 7))
        make_face()
    extrude(amount=F4_T126_DEPTH)

    split(bisect_by=Plane(origin=(-6.25, 10.8253175473, 0), x_dir=(0, 0, 1), z_dir=(0.5, -0.8660254038, 0)), keep=Keep.TOP)


with BuildPart() as f4_tool120_1:
    add(f4_tool120.part)

    # F4_t128: intersect F4_tool124
    add(f4_tool124.part, mode=Mode.INTERSECT)


with BuildPart() as f2_16:
    add(f2_15.part)

    # F4_t118: cut F4_tool120
    add(f4_tool120_1.part, mode=Mode.SUBTRACT)


with BuildPart() as f4_tool131:
    # F4_s132 → F4_t133 (new body)
    with BuildSketch(Plane(origin=(-43.9940905122, -25.4, 0), x_dir=(0, 0, 1), z_dir=(0.8660254038, 0.5, 0))):
        with BuildLine():
            ThreePointArc((6, 12.5), (6.7071067812, 12.2071067812), (7, 11.5))
            Line((7, 11.5), (7, 12.5))
            Line((7, 12.5), (6, 12.5))
        make_face()
    extrude(amount=F4_T133_DEPTH)

    split(bisect_by=Plane(origin=(-6.25, -10.8253175473, 0), x_dir=(0, 0, 1), z_dir=(0.5, 0.8660254038, 0)), keep=Keep.TOP)


with BuildPart() as f4_tool135:
    # F4_s136 → F4_t137 (new body)
    with BuildSketch(Plane(origin=(4.0849364905, -2.3584391824, 0), x_dir=(0, 0, 1), z_dir=(0.8660254038, -0.5, 0))):
        with BuildLine():
            ThreePointArc((6, 12.5), (6.7071067812, 12.2071067812), (7, 11.5))
            Line((7, 11.5), (7, 12.5))
            Line((7, 12.5), (6, 12.5))
        make_face()
    extrude(amount=F4_T137_DEPTH)

    split(bisect_by=Plane(origin=(6.25, -10.8253175473, 0), x_dir=(0, 0, 1), z_dir=(-0.5, 0.8660254038, 0)), keep=Keep.TOP)


with BuildPart() as f4_tool131_1:
    add(f4_tool131.part)

    # F4_t139: intersect F4_tool135
    add(f4_tool135.part, mode=Mode.INTERSECT)


with BuildPart() as f2_17:
    add(f2_16.part)

    # F4_t129: cut F4_tool131
    add(f4_tool131_1.part, mode=Mode.SUBTRACT)


with BuildPart() as f4_tool142:
    # F4_s143 → F4_t144 (new body)
    with BuildSketch(Plane(origin=(-43.9940905122, -25.4, 0), x_dir=(0, 0, 1), z_dir=(0.8660254038, 0.5, 0))):
        with BuildLine():
            ThreePointArc((1, 12.5), (0.2928932188, 12.2071067812), (0, 11.5))
            Line((0, 11.5), (0, 12.5))
            Line((0, 12.5), (1, 12.5))
        make_face()
    extrude(amount=F4_T144_DEPTH)

    split(bisect_by=Plane(origin=(-6.25, -10.8253175473, 0), x_dir=(0, 0, 1), z_dir=(0.5, 0.8660254038, 0)), keep=Keep.TOP)


with BuildPart() as f4_tool146:
    # F4_s147 → F4_t148 (new body)
    with BuildSketch(Plane(origin=(4.0849364905, -2.3584391824, 0), x_dir=(0, 0, 1), z_dir=(0.8660254038, -0.5, 0))):
        with BuildLine():
            ThreePointArc((1, 12.5), (0.2928932188, 12.2071067812), (0, 11.5))
            Line((0, 11.5), (0, 12.5))
            Line((0, 12.5), (1, 12.5))
        make_face()
    extrude(amount=F4_T148_DEPTH)

    split(bisect_by=Plane(origin=(6.25, -10.8253175473, 0), x_dir=(0, 0, 1), z_dir=(-0.5, 0.8660254038, 0)), keep=Keep.TOP)


with BuildPart() as f4_tool142_1:
    add(f4_tool142.part)

    # F4_t150: intersect F4_tool146
    add(f4_tool146.part, mode=Mode.INTERSECT)


with BuildPart() as f2_18:
    add(f2_17.part)

    # F4_t140: cut F4_tool142
    add(f4_tool142_1.part, mode=Mode.SUBTRACT)

    # F5
    f5_edges = [f2_18.edges().sort_by_distance(p)[0] for p in [
        (-11, 0, 7),
        (-11, 0, 0),
    ]]
    fillet(f5_edges, radius=F5_R)


solid = f2_18.part
